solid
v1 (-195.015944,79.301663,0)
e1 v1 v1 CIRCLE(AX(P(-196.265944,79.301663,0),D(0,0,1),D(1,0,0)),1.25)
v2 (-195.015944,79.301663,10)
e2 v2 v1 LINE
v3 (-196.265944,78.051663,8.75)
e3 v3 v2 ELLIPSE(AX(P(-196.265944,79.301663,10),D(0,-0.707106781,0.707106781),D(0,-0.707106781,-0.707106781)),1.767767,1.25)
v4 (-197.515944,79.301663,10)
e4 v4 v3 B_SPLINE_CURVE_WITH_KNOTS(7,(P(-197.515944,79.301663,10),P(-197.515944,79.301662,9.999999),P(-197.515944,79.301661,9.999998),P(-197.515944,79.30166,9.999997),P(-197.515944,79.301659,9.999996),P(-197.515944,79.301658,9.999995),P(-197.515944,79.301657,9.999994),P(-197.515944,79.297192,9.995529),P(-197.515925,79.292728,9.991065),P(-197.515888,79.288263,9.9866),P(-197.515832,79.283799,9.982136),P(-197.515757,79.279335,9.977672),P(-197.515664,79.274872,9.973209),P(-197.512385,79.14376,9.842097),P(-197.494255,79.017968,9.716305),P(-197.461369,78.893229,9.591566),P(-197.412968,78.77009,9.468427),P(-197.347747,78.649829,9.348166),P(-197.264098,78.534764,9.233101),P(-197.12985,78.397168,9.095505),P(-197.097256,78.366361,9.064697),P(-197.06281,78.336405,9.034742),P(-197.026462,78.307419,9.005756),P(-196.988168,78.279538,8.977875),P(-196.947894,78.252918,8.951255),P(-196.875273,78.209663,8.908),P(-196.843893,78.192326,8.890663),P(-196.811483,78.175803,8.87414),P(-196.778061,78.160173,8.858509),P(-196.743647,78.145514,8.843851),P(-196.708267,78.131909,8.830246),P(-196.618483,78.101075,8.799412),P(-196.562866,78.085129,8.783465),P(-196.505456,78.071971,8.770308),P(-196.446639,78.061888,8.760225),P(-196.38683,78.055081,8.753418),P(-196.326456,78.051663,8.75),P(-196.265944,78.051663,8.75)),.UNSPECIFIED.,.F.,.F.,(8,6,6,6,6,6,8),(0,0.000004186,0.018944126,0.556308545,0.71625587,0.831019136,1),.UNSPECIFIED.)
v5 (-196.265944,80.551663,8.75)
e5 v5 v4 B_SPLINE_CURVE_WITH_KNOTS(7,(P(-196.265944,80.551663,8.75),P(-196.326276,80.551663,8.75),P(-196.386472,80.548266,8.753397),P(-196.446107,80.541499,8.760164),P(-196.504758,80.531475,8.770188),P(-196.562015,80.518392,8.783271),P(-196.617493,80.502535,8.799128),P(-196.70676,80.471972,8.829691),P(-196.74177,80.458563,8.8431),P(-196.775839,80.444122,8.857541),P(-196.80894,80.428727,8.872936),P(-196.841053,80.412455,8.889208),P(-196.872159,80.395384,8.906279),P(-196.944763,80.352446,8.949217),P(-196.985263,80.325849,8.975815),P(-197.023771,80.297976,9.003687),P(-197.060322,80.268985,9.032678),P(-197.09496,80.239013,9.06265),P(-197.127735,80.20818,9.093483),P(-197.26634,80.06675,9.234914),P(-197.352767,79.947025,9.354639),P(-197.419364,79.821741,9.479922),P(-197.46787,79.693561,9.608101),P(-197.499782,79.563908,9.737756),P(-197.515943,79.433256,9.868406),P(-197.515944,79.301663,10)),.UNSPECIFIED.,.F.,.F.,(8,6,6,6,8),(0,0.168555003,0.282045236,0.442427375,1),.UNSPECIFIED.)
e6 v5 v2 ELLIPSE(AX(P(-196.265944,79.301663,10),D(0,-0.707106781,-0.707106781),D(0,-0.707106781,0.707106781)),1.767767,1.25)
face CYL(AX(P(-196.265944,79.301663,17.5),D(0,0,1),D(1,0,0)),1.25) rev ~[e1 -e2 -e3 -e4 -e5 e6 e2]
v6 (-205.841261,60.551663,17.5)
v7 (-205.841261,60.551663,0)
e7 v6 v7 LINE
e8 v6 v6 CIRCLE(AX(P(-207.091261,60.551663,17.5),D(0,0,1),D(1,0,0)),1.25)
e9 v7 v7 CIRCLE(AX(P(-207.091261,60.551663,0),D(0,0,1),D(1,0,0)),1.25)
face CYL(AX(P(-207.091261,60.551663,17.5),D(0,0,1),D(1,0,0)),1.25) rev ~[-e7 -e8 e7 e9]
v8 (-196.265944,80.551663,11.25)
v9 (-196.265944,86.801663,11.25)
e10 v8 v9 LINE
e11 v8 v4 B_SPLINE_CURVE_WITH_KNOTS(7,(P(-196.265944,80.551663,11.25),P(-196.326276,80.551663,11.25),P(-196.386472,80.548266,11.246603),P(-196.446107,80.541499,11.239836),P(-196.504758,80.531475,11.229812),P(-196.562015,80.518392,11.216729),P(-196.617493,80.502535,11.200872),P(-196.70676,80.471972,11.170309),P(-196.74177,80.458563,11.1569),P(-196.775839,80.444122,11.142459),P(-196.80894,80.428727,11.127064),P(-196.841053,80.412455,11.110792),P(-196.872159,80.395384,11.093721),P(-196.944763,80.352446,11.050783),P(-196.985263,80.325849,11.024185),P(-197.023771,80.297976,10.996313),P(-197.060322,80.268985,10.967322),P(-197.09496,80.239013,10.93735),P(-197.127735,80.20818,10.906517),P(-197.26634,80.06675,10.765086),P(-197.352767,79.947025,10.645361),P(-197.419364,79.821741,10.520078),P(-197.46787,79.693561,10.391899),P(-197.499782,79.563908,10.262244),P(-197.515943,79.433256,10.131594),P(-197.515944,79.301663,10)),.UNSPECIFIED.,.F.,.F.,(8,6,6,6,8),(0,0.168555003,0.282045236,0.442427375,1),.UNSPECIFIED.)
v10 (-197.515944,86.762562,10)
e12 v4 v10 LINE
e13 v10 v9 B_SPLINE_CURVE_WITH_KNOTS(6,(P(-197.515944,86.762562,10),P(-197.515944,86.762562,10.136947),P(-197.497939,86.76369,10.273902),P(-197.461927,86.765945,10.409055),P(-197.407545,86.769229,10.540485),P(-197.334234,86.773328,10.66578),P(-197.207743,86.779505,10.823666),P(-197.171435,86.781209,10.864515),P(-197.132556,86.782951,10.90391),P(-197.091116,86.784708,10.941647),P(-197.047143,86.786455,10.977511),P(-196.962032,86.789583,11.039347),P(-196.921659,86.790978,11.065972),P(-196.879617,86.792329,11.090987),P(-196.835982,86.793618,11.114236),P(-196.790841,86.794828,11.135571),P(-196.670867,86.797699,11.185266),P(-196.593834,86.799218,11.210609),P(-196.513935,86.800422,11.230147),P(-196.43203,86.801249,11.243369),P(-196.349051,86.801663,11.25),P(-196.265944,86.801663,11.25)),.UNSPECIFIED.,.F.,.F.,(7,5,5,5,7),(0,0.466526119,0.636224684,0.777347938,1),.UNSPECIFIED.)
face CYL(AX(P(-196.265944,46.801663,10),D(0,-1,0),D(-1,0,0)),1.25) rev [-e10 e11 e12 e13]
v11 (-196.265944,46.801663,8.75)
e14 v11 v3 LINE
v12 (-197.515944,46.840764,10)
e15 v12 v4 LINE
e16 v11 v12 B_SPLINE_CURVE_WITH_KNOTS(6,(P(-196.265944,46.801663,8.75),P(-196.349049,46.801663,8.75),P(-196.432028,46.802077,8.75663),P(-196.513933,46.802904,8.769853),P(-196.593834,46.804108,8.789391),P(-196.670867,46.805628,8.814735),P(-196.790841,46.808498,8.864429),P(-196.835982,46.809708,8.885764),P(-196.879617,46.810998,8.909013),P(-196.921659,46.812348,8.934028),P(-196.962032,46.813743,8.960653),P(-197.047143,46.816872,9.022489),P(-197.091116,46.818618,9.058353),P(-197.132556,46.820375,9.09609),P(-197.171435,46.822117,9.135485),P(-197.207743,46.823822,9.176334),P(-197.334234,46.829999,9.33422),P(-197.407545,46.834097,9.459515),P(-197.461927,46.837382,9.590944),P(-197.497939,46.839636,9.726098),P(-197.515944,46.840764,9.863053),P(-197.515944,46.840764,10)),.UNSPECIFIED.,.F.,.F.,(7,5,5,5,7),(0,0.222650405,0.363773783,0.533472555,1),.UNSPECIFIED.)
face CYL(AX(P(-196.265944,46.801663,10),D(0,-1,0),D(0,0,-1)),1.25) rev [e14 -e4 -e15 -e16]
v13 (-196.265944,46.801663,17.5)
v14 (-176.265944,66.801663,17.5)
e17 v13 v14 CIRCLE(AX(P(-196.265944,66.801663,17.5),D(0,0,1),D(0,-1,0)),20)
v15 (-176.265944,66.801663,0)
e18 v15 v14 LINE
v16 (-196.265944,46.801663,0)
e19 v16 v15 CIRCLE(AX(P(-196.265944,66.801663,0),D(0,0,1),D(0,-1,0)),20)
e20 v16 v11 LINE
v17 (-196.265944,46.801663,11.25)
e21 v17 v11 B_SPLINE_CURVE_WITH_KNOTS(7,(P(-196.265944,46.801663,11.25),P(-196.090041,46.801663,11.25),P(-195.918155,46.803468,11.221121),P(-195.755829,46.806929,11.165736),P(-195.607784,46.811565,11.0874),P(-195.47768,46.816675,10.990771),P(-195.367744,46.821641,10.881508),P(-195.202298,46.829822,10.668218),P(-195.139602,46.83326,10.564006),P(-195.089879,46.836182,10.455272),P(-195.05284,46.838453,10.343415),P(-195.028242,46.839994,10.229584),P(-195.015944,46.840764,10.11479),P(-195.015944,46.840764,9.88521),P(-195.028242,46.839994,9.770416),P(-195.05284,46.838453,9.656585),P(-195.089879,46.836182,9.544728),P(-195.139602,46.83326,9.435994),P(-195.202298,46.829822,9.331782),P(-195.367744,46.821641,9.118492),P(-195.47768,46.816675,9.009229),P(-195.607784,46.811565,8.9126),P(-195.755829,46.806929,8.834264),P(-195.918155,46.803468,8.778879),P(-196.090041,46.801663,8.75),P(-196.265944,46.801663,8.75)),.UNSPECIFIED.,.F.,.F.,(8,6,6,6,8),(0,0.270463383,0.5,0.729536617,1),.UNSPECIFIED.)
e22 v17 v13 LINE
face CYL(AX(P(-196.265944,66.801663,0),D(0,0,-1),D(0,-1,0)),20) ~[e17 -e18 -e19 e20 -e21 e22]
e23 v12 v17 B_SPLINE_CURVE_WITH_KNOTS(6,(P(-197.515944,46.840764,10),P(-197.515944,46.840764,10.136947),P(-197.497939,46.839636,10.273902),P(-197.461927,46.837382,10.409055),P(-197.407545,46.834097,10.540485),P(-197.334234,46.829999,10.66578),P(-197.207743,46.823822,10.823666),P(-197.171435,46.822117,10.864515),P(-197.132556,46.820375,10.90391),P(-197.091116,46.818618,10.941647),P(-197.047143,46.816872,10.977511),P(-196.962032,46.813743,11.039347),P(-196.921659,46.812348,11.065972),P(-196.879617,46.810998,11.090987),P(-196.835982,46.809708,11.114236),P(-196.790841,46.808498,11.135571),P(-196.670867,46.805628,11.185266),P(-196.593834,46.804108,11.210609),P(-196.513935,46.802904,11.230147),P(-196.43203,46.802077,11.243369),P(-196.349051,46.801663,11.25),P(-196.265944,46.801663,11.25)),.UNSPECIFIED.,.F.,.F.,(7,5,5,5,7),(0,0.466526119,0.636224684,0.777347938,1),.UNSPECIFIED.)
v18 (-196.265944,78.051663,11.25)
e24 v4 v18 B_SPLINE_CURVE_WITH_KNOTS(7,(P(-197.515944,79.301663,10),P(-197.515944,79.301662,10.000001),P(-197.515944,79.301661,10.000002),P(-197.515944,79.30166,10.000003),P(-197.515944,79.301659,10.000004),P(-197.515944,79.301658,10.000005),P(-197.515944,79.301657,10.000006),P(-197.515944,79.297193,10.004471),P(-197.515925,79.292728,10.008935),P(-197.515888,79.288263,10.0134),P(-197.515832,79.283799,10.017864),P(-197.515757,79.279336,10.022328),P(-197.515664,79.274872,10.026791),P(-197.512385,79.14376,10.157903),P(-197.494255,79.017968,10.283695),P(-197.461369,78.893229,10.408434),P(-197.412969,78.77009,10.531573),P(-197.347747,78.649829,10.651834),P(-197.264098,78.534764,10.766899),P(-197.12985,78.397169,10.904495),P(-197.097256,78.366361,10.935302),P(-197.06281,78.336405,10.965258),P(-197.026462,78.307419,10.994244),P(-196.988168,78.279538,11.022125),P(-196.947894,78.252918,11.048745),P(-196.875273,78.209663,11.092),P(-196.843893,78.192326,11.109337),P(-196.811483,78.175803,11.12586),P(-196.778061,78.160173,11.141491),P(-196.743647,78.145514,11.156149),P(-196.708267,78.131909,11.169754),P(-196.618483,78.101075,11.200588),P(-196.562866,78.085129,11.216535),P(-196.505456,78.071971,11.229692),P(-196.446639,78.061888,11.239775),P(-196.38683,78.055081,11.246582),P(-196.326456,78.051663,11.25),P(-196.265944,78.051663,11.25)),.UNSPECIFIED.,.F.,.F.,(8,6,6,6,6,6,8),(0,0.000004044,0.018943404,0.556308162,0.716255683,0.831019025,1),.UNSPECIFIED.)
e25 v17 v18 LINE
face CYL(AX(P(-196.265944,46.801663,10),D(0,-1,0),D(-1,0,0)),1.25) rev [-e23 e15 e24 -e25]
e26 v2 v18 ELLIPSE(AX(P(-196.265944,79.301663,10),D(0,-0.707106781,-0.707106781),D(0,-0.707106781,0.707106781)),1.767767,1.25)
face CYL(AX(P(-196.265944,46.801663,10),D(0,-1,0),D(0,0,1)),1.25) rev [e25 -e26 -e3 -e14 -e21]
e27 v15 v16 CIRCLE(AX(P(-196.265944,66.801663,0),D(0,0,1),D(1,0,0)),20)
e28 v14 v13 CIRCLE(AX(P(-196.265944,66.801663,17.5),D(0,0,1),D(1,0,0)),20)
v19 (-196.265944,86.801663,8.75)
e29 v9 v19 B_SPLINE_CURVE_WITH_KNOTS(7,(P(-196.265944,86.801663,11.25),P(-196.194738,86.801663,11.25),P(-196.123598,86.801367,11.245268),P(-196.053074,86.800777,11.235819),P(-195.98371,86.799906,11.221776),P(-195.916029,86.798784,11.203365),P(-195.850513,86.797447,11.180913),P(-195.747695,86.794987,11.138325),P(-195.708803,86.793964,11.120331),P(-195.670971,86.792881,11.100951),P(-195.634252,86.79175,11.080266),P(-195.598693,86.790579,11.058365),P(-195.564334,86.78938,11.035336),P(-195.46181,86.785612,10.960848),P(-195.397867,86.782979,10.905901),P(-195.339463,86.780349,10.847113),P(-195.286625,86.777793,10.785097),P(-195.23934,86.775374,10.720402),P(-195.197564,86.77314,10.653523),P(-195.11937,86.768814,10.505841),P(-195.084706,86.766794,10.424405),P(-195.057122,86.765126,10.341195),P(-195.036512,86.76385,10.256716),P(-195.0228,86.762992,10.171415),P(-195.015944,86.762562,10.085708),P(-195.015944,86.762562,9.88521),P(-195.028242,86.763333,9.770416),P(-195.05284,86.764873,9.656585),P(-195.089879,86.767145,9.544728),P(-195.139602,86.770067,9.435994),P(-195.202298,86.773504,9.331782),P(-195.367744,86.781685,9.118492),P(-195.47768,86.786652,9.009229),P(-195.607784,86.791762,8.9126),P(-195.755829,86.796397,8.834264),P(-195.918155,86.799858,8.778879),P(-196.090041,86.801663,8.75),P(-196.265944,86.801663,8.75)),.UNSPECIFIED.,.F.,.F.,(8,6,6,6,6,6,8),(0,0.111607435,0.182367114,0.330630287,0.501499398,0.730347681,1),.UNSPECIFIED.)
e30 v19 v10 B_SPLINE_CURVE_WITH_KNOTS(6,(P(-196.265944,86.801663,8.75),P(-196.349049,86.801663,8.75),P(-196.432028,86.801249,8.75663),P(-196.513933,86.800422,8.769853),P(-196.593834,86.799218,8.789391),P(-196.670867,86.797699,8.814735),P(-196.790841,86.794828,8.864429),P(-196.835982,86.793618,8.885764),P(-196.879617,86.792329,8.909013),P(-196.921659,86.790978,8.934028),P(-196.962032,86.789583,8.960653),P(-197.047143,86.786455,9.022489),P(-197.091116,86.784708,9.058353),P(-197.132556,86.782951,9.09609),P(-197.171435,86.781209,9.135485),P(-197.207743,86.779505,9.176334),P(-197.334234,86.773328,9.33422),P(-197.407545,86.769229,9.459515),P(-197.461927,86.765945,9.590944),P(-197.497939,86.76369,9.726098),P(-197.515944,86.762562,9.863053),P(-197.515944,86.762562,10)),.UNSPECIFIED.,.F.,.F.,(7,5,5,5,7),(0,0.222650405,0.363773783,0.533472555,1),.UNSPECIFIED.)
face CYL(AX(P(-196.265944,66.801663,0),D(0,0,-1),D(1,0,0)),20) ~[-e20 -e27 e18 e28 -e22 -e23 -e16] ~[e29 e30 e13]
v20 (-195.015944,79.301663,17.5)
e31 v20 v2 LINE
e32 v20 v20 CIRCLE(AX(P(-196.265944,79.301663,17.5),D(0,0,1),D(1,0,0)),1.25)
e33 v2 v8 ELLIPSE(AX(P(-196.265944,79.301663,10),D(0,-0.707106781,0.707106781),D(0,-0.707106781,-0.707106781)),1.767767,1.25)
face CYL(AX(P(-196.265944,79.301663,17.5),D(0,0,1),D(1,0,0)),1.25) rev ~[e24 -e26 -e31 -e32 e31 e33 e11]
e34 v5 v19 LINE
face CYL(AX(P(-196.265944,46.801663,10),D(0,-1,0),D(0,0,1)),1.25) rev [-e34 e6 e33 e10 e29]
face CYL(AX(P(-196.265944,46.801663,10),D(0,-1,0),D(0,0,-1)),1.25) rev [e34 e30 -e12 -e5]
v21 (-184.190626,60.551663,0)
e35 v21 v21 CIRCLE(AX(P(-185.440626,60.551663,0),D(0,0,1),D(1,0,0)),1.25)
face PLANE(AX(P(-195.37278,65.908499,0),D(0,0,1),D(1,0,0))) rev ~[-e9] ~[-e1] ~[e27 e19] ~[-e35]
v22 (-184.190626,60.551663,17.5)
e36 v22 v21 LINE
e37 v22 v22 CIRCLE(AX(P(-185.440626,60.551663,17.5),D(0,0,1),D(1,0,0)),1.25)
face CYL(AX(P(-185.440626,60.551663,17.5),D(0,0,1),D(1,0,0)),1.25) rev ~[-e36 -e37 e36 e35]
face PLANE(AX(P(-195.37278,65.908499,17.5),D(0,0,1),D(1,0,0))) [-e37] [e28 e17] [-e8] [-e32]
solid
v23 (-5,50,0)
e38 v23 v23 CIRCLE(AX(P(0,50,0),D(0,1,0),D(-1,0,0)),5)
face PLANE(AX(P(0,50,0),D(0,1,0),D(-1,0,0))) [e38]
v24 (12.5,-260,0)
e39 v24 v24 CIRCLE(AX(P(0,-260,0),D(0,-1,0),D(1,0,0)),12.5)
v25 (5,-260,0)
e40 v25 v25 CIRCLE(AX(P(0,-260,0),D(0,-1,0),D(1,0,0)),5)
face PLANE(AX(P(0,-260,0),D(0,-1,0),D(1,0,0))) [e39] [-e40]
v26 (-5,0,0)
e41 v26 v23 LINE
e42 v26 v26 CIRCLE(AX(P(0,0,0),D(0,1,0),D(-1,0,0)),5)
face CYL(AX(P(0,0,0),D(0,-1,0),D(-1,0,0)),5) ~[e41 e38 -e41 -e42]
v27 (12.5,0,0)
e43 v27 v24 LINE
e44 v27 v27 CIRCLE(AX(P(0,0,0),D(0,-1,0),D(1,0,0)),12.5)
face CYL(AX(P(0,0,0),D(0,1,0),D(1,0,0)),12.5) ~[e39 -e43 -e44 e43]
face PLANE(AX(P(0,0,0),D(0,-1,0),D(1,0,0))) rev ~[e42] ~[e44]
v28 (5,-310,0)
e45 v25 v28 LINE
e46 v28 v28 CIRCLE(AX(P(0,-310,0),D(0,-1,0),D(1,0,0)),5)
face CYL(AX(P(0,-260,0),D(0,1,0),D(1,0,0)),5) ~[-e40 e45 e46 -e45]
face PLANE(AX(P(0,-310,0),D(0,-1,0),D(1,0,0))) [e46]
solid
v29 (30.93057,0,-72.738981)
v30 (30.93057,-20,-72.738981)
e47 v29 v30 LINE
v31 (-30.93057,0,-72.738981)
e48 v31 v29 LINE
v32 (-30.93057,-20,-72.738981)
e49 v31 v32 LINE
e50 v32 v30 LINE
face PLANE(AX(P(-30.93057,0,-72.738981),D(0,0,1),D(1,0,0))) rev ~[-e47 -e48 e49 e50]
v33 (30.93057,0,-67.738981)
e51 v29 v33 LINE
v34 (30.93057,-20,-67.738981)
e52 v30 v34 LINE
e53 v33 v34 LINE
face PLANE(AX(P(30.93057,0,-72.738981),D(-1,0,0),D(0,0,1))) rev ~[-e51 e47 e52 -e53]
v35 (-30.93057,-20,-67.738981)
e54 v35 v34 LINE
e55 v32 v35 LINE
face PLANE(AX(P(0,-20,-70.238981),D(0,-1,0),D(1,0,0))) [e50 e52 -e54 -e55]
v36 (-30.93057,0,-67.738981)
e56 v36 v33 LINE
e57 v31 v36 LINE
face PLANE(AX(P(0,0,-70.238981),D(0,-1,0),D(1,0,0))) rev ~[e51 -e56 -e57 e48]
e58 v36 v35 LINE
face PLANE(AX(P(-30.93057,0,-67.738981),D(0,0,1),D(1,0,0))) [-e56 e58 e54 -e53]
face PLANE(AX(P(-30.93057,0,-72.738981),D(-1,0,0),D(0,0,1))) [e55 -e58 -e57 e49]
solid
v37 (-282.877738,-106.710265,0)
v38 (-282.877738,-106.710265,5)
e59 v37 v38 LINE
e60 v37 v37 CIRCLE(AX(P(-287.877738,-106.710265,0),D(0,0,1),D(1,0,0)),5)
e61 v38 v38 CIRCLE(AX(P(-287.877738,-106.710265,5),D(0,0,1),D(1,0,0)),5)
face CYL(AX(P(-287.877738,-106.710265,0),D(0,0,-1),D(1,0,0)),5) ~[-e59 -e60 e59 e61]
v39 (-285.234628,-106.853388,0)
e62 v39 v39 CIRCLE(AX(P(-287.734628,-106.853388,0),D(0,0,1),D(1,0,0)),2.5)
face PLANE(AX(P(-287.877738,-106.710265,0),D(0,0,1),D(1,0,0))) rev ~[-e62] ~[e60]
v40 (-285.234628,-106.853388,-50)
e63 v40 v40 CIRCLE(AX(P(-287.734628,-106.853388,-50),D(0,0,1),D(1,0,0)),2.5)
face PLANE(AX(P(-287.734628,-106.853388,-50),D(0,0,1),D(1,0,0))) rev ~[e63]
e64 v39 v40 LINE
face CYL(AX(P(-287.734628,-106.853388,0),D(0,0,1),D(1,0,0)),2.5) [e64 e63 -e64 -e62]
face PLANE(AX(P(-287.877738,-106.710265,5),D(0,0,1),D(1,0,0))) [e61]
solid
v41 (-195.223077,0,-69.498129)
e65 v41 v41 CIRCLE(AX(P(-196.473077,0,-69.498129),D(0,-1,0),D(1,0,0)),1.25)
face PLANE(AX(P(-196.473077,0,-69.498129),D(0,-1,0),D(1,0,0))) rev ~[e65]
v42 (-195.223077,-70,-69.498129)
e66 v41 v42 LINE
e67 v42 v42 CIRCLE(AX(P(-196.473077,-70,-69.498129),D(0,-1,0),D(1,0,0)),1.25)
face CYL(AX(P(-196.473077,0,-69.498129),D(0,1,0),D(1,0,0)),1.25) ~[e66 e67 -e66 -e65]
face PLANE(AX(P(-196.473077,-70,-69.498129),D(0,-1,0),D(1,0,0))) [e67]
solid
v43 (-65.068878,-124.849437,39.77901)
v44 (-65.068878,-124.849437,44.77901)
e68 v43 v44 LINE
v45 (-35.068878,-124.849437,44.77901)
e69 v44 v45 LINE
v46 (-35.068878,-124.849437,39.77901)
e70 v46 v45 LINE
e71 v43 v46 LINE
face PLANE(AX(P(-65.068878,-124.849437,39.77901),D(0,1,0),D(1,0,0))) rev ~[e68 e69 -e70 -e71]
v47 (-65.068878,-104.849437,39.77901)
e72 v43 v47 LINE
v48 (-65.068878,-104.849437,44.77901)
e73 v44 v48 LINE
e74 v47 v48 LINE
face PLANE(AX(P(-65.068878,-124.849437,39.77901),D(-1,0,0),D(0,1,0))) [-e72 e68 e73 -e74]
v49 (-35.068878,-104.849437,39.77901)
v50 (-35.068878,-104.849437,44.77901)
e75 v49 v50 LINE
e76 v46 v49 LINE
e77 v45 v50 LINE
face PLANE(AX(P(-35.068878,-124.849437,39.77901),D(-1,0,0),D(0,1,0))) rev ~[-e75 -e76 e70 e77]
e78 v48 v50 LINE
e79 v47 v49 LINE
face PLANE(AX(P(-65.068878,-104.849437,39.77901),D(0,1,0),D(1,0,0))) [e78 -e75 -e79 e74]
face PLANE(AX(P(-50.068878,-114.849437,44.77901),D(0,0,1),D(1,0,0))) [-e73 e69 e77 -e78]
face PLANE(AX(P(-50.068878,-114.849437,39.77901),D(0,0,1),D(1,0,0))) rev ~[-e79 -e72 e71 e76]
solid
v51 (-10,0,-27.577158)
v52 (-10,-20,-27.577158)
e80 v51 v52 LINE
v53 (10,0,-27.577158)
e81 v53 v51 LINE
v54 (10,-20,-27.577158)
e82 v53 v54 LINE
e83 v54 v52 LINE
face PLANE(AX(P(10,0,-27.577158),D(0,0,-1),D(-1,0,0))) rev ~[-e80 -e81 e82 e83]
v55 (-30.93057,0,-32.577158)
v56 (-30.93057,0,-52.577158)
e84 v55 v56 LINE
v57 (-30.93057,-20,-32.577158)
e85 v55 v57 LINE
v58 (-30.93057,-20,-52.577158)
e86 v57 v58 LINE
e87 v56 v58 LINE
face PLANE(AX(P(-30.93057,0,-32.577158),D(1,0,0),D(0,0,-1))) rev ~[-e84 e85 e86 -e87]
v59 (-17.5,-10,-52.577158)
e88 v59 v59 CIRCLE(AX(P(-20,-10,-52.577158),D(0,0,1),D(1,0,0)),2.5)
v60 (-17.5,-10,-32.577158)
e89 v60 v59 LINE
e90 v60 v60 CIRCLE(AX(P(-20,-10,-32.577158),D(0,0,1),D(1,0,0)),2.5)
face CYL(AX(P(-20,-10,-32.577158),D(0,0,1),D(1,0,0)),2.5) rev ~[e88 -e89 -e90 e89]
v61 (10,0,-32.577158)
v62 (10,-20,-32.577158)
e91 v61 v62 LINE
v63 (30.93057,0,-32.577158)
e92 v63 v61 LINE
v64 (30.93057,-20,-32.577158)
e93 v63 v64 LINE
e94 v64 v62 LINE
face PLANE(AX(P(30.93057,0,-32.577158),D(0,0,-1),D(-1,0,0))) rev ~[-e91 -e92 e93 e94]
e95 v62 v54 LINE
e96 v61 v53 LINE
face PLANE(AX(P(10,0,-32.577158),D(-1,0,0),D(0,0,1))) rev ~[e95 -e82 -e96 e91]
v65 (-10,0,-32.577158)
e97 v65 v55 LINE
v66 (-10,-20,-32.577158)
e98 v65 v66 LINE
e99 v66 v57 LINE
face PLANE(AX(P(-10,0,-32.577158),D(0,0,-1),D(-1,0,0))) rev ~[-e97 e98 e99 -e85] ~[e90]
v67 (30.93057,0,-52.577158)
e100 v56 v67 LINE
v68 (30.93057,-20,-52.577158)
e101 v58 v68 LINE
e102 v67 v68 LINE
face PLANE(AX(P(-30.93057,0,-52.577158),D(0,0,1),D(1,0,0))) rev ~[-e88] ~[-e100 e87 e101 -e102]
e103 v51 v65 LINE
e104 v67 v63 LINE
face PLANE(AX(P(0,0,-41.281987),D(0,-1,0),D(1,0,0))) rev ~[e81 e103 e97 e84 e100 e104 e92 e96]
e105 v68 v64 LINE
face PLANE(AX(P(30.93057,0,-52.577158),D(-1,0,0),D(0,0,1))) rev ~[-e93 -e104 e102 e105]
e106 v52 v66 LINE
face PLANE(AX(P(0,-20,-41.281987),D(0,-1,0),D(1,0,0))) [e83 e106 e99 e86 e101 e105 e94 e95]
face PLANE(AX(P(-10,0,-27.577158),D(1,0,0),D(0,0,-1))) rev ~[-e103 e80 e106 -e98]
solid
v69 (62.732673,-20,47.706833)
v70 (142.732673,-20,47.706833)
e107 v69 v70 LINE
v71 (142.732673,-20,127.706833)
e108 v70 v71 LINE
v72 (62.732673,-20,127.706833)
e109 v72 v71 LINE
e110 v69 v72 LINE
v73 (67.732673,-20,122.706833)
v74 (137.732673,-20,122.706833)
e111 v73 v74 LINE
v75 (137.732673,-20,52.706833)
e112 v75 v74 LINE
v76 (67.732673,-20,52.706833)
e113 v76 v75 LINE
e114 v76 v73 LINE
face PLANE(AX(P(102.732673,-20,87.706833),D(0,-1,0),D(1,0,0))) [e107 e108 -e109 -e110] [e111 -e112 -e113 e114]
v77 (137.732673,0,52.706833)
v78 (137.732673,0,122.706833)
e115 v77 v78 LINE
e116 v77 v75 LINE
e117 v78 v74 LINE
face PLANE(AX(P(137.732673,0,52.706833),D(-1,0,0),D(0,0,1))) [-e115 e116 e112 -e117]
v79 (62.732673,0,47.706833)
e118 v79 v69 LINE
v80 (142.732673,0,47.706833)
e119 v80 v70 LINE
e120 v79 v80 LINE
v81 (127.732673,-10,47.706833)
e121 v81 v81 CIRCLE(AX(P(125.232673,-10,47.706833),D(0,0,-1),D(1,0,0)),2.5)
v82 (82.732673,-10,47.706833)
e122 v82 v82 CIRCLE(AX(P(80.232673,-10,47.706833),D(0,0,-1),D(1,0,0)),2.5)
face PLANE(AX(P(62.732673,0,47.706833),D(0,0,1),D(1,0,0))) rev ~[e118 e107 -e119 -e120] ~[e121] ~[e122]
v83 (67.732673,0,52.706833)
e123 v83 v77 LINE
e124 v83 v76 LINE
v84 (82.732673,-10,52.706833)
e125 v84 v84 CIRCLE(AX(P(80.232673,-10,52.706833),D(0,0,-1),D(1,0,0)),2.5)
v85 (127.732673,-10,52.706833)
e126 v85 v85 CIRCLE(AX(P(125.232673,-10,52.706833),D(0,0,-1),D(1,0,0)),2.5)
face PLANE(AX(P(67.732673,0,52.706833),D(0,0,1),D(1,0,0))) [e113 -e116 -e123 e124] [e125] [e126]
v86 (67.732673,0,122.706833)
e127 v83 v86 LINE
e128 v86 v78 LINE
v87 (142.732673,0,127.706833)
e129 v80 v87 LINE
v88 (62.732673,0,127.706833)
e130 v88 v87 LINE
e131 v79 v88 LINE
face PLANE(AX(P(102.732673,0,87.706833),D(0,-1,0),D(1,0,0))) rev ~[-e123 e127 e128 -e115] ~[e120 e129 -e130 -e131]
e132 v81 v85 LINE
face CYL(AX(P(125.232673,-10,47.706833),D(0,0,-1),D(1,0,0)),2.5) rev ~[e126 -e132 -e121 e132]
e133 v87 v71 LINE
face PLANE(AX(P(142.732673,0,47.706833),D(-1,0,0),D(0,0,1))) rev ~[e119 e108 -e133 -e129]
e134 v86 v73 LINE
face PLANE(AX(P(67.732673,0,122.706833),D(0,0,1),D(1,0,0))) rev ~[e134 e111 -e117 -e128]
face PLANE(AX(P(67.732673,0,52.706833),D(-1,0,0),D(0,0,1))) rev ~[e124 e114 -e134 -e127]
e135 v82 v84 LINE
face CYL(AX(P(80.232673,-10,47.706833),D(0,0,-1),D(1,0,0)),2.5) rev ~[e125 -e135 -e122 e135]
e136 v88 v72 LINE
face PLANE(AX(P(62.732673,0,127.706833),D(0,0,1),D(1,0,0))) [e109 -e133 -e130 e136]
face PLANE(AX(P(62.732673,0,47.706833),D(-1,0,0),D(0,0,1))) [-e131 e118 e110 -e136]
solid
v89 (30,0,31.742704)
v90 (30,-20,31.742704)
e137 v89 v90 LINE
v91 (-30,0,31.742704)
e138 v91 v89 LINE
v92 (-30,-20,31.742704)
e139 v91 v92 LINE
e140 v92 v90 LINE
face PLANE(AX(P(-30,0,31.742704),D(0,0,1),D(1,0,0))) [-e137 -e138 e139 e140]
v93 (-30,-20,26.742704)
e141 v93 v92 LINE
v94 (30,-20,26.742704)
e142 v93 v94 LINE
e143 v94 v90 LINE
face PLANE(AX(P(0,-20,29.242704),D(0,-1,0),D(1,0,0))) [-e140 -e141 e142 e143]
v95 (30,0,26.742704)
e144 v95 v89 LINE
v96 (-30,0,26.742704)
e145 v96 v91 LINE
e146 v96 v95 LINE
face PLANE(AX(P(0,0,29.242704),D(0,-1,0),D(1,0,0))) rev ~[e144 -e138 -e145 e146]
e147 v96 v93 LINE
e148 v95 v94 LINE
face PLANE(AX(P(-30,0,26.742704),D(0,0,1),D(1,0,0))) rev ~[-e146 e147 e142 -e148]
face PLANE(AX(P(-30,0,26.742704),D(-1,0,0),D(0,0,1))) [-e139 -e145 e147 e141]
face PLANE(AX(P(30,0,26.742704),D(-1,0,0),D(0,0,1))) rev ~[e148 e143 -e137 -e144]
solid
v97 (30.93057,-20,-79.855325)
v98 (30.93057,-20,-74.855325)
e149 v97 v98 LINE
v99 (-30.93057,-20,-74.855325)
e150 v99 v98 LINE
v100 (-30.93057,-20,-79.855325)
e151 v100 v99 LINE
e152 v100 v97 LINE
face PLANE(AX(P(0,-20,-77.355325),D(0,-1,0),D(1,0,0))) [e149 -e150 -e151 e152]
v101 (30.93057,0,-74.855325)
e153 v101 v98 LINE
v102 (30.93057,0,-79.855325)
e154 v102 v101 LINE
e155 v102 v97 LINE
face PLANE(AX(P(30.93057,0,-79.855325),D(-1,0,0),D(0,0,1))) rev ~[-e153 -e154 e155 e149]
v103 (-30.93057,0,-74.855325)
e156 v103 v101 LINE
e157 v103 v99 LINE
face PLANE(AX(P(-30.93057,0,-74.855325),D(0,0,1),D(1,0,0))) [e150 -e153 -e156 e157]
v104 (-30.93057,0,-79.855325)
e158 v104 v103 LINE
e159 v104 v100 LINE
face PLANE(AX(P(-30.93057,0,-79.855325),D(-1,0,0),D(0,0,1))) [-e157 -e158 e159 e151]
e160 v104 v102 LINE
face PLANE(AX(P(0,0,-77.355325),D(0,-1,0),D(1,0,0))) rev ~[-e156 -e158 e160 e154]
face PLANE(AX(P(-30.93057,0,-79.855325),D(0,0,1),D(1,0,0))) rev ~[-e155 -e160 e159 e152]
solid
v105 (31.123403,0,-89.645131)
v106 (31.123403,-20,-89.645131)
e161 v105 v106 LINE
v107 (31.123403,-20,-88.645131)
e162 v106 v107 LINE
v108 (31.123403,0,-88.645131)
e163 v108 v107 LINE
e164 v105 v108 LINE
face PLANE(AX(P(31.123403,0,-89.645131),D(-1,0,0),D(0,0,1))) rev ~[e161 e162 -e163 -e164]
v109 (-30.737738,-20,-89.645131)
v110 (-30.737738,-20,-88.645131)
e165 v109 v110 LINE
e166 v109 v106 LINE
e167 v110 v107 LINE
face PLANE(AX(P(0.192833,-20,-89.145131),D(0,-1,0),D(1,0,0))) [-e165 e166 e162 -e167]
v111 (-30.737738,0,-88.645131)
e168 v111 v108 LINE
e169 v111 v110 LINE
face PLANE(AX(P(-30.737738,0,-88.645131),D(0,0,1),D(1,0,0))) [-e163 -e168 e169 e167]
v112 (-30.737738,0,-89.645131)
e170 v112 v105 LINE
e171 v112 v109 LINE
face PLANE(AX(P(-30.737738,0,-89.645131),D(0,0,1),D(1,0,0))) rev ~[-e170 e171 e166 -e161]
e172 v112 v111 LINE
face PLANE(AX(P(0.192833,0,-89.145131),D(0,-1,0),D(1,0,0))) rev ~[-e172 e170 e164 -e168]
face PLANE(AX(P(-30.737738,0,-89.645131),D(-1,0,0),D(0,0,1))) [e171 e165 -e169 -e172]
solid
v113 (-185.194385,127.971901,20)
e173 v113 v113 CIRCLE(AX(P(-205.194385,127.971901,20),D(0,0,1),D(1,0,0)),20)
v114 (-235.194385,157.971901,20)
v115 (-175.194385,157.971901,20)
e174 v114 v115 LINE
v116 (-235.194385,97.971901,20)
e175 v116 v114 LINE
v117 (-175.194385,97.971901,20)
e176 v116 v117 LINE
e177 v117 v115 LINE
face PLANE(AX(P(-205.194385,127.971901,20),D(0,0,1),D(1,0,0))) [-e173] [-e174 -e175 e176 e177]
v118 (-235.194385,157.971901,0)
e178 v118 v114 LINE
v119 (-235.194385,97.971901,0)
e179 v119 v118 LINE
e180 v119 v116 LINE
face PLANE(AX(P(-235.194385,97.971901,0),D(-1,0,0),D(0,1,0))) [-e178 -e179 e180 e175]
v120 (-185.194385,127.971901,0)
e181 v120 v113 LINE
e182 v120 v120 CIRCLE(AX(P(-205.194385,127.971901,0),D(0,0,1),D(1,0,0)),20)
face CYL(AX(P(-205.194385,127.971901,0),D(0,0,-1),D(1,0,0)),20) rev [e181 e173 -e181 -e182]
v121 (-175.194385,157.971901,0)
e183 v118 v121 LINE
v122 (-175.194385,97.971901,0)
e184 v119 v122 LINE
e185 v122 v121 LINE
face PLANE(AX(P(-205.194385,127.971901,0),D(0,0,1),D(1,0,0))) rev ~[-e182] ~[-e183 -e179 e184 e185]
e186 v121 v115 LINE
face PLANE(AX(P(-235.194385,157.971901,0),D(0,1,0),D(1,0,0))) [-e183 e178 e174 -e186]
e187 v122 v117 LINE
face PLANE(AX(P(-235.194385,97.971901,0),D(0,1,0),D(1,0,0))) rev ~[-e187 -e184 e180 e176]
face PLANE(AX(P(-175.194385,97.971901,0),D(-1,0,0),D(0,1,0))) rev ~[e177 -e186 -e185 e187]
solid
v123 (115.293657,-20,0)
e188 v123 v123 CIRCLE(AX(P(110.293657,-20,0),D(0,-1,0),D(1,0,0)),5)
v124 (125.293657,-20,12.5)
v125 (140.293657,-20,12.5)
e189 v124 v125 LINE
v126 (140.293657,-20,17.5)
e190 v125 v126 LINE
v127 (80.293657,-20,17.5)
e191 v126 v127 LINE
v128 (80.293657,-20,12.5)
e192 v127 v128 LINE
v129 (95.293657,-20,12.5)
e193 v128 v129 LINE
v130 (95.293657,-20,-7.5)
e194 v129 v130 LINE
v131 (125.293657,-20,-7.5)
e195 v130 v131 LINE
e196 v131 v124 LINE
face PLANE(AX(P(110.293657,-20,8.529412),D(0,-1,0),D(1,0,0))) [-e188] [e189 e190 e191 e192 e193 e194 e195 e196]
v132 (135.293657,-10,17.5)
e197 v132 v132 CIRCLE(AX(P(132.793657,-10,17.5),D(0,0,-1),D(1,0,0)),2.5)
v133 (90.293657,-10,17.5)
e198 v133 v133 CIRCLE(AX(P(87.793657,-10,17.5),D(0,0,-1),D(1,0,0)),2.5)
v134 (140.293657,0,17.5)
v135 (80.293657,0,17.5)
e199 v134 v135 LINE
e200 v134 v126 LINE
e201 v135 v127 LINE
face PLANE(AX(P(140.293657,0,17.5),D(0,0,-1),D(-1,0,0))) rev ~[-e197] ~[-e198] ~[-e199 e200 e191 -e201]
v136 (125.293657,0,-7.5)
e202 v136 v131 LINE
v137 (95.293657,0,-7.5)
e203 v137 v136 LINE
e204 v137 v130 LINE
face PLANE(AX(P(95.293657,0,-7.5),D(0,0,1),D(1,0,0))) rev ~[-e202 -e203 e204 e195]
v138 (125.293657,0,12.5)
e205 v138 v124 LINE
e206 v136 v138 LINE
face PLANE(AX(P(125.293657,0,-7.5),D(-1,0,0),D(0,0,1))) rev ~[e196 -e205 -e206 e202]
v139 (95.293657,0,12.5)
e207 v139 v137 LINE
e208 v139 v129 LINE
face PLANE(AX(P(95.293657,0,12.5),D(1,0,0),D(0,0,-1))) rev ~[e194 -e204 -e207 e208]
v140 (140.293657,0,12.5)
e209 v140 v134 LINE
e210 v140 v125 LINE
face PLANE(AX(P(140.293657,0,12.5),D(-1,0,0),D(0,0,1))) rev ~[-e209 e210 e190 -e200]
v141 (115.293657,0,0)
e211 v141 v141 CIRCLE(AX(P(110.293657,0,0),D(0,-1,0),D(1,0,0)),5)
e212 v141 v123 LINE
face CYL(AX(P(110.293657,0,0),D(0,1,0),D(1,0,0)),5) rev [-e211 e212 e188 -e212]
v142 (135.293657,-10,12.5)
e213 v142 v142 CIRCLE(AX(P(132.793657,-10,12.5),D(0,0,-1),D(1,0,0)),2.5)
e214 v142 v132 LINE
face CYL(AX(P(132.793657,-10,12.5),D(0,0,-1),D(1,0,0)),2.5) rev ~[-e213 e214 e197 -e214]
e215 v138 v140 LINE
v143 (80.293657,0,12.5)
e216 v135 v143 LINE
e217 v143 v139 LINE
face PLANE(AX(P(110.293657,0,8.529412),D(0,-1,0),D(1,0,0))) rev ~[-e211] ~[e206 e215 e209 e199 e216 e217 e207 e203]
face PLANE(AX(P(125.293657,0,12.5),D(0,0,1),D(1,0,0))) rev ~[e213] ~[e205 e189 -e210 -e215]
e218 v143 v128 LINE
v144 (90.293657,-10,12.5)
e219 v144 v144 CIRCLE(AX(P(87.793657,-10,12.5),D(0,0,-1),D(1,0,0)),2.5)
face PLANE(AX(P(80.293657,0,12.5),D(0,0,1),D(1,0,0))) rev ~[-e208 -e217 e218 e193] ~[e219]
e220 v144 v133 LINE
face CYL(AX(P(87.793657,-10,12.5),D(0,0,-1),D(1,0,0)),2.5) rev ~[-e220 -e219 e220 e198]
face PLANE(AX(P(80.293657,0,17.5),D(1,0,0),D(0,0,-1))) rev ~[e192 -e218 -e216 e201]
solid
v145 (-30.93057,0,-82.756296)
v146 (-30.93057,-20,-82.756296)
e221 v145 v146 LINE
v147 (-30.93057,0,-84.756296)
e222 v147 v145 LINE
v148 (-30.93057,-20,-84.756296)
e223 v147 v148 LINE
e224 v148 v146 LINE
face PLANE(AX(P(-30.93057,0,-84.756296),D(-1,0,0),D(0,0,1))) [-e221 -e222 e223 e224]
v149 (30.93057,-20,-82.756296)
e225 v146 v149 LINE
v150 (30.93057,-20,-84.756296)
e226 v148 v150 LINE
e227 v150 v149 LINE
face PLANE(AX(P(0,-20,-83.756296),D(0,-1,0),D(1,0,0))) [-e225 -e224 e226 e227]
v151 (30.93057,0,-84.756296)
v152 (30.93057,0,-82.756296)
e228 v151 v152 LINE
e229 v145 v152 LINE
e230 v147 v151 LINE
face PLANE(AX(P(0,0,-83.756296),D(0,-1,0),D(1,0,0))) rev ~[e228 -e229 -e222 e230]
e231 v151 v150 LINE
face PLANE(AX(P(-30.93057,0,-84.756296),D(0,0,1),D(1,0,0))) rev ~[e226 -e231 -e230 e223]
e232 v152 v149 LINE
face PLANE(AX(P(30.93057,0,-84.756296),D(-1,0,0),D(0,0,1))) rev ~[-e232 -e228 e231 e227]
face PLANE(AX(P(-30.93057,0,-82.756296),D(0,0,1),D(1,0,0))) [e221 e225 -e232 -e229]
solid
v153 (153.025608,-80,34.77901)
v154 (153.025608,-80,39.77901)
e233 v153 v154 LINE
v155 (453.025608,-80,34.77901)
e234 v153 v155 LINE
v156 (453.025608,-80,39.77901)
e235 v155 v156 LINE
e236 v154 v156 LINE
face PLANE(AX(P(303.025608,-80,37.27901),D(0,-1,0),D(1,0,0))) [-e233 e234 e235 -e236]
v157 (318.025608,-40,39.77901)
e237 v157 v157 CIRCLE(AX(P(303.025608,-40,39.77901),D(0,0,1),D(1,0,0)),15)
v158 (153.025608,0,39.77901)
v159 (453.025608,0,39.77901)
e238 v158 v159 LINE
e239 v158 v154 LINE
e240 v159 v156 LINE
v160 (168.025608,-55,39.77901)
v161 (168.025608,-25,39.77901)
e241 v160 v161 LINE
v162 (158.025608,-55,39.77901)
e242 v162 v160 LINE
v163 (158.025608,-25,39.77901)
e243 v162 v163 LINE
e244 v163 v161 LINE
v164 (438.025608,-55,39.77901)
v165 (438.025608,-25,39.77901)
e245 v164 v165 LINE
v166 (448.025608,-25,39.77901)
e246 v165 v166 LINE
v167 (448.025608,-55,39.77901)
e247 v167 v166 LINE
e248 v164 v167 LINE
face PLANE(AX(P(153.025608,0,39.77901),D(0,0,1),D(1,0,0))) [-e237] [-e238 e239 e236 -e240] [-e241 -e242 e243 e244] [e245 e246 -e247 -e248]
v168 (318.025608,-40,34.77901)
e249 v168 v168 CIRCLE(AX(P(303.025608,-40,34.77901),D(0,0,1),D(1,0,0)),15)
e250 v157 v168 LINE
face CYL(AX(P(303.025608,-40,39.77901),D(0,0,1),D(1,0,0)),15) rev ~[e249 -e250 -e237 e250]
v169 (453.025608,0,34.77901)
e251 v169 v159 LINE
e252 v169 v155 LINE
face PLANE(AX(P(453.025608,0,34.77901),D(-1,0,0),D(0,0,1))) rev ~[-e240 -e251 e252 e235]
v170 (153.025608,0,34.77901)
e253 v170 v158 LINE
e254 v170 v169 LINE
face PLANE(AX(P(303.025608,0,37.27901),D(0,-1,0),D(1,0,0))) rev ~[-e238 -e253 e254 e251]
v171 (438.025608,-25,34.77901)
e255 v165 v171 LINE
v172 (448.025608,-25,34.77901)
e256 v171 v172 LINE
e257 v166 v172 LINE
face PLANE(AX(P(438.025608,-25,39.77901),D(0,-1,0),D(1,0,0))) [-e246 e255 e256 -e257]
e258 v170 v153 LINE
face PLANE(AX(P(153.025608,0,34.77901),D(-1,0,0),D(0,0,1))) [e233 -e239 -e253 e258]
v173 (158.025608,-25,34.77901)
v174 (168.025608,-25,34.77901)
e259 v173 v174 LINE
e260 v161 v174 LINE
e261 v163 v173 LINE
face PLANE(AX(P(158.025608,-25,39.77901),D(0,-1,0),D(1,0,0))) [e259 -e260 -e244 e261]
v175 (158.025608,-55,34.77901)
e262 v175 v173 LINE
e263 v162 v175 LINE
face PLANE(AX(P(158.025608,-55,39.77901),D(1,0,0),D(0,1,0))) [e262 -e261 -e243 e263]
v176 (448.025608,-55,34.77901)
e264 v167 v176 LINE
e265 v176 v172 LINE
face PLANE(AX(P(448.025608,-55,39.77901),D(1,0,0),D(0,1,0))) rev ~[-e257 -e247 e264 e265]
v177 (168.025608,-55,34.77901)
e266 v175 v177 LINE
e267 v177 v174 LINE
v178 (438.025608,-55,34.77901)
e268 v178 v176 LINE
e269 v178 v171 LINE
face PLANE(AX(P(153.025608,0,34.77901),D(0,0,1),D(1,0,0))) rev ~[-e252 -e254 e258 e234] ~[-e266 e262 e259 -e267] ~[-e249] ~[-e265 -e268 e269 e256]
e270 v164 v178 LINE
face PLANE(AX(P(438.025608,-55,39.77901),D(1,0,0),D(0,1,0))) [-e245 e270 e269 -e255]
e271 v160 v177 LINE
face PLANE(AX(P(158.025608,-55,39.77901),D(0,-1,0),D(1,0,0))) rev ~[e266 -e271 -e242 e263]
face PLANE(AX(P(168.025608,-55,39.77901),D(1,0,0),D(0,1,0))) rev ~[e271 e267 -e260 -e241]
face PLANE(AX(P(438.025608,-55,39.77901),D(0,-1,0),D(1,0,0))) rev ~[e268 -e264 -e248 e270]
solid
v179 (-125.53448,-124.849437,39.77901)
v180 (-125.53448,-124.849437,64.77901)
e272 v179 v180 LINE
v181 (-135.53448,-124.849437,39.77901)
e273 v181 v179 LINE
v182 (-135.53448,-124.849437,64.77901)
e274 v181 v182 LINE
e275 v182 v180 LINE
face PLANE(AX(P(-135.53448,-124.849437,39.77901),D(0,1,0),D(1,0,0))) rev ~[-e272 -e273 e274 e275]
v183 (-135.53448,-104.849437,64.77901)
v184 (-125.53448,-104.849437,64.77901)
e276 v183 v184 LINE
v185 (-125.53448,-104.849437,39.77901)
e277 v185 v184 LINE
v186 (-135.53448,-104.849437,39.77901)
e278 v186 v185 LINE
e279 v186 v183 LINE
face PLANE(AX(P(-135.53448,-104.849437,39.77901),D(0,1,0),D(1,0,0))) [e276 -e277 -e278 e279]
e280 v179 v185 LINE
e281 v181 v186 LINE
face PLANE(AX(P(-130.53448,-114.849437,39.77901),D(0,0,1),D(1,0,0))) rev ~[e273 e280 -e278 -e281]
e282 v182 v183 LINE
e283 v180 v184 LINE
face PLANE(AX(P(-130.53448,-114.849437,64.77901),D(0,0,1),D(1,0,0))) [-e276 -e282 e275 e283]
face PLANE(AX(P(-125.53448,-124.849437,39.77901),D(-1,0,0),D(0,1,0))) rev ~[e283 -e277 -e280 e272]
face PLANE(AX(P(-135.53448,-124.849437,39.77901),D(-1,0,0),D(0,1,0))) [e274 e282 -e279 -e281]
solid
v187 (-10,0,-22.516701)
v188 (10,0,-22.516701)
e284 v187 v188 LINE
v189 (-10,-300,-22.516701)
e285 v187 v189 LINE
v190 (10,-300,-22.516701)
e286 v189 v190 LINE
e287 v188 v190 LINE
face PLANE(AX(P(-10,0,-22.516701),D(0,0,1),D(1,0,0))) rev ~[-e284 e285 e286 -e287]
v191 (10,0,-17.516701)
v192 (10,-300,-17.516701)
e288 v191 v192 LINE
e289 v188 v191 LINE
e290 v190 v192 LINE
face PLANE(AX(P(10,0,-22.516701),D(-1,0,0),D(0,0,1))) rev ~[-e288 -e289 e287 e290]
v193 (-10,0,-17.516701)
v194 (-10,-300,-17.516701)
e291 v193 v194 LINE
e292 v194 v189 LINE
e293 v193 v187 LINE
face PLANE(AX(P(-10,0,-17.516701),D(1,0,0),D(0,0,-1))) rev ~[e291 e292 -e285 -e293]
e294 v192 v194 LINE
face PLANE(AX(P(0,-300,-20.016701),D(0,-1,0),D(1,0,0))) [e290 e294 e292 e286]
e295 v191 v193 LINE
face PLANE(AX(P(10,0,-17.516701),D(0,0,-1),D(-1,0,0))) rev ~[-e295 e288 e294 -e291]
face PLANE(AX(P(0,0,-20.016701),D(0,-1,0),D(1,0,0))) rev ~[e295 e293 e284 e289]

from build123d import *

# Parameters (mm, degrees)
F0_R      = 5
F1_DEPTH  = 20
F0_W      = 60
F0_H      = 5
F0_W_2    = 80
F0_H_2    = 80
F0_W_3    = 70
F0_H_3    = 70
F0_W_4    = 61.861140081
F0_H_4    = 1
F0_H_5    = 2
F0_R_2    = 12.5
F2_DEPTH  = 260
F3_R      = 5
F4_DEPTH  = 50
F5_DEPTH  = 300
F6_R      = 2.5
F7_DEPTH  = 25
F9_R      = 2.5
F8_R      = 2.5
F10_DEPTH = 25
F14_R     = 5
F15_DEPTH = 50
F16_W     = 300
F16_H     = 5
F17_DEPTH = 80
F20_DEPTH = 17.5
F19_W     = 60
F19_H     = 60
F19_R     = 20
F21_DEPTH = 20
F18_W     = 10
F18_H     = 30
F18_R     = 15
F22_DEPTH = 129.4251411048
F18_H_2   = 20
F23_DEPTH = 25
F18_W_2   = 30
F24_DEPTH = 5
F13_R     = 2.5
F25_DEPTH = 5
F26_R     = 5
F27_DEPTH = 5
F28_R     = 2.5
F29_DEPTH = 50
F32_DEPTH = 111.1712381574
F33_R     = 1.25
F34_DEPTH = 70
F35_R     = 1.25
F36_DEPTH = 107.1461310813


# Not quite as in the source:
# - a feature of the source that left no trace in its solid (it failed there, or was rolled back) is left out
# - a feature names something its author has since deleted; it is built from what else it names


with BuildPart() as f1:
    # F0 (on Front) → F1 (new body)
    with BuildSketch(Plane.XZ):
        Polygon((95.2936565876, -7.5), (110.2936565876, -7.5), (125.2936565876, -7.5), (125.2936565876, 12.5), (140.2936565876, 12.5), (140.2936565876, 17.5), (110.2936565876, 17.5), (80.2936565876, 17.5), (80.2936565876, 12.5), (95.2936565876, 12.5), align=None)
        with Locations((110.2936565876, 0)):
            Circle(F0_R, mode=Mode.SUBTRACT)
    extrude(amount=F1_DEPTH)

    # F9 (on face) + F8 (on face) → F10 (cut)
    with BuildSketch(Plane(origin=(0, 0, 12.5), x_dir=(1, 0, 0), z_dir=(0, 0, -1))):
        with Locations((87.7936565876, 10)):
            Circle(F9_R)
    with BuildSketch(Plane(origin=(0, 0, 12.5), x_dir=(1, 0, 0), z_dir=(0, 0, -1))):
        with Locations((132.7936565876, 10)):
            Circle(F8_R)
    extrude(amount=-F10_DEPTH, mode=Mode.SUBTRACT)


with BuildPart() as f1b:
    # F0 (on Front) → F1, piece 2 (new body)
    with BuildSketch(Plane.XZ):
        with Locations((0, 29.2427036911)):
            Rectangle(F0_W, F0_H)
    extrude(amount=F1_DEPTH)


with BuildPart() as f1c:
    # F0 (on Front) → F1, piece 3 (new body)
    with BuildSketch(Plane.XZ):
        Polygon((10, -27.5771580637), (0, -27.5771580637), (-10, -27.5771580637), (-10, -32.5771580637), (-10.9305700405, -32.5771580637), (-30.9305700405, -32.5771580637), (-30.9305700405, -52.5771580637), (0, -52.5771580637), (30.9305700405, -52.5771580637), (30.9305700405, -32.5771580637), (10.9305700405, -32.5771580637), (10, -32.5771580637), align=None)
    extrude(amount=F1_DEPTH)

    # F6 (on face) → F7 (cut)
    with BuildSketch(Plane.XY.offset(-32.5771580637)):
        with Locations((-20, -10)):
            Circle(F6_R)
    extrude(amount=-F7_DEPTH, mode=Mode.SUBTRACT)


with BuildPart() as f1d:
    # F0 (on Front) → F1, piece 4 (new body)
    with BuildSketch(Plane.XZ):
        with Locations((102.7326732874, 87.7068325877)):
            Rectangle(F0_W_2, F0_H_2)
        with Locations((102.7326732874, 87.7068325877)):
            Rectangle(F0_W_3, F0_H_3, mode=Mode.SUBTRACT)
    extrude(amount=F1_DEPTH)

    # F13 (on face) → F25 (cut, through all)
    with BuildSketch(Plane(origin=(0, 0, 47.7068325877), x_dir=(1, 0, 0), z_dir=(0, 0, -1))):
        with Locations((125.2326732874, 10)):
            Circle(F13_R)
        with Locations((80.2326732874, 10)):
            Circle(F13_R)
    extrude(amount=-F25_DEPTH, mode=Mode.SUBTRACT)


with BuildPart() as f1e:
    # F0 (on Front) → F1, piece 5 (new body)
    with BuildSketch(Plane.XZ):
        with Locations((0, -77.355325222)):
            Rectangle(F0_W_4, F0_H)
    extrude(amount=F1_DEPTH)


with BuildPart() as f1f:
    # F0 (on Front) → F1, piece 6 (new body)
    with BuildSketch(Plane.XZ):
        with Locations((0.1928325291, -89.1451310813)):
            Rectangle(F0_W_4, F0_H_4)
    extrude(amount=F1_DEPTH)


with BuildPart() as f1g:
    # F0 (on Front) → F1, piece 7 (new body)
    with BuildSketch(Plane.XZ):
        with Locations((0, -83.756296128)):
            Rectangle(F0_W_4, F0_H_5)
    extrude(amount=F1_DEPTH)


with BuildPart() as f1h:
    # F0 (on Front) → F1, piece 8 (new body)
    with BuildSketch(Plane.XZ):
        with Locations((0, -70.2389810979)):
            Rectangle(F0_W_4, F0_H)
    extrude(amount=F1_DEPTH)


with BuildPart() as f2:
    # F0 (on Front) → F2 (new body)
    with BuildSketch(Plane.XZ):
        Circle(F0_R_2)
    extrude(amount=F2_DEPTH)

    # F3 (on face) → F4 (join)
    with BuildSketch(Plane.XZ.offset(260)):
        Circle(F3_R)
    extrude(amount=F4_DEPTH)

    # F14 (on face) → F15 (join)
    with BuildSketch(Plane(origin=(0, 0, 0), x_dir=(-1, 0, 0), z_dir=(0, 1, 0))):
        Circle(F14_R)
    extrude(amount=F15_DEPTH)


with BuildPart() as f5:
    # F0 (on Front) → F5 (new body)
    with BuildSketch(Plane.XZ):
        Polygon((-10, -22.5167013705), (0, -22.5167013705), (10, -22.5167013705), (10, -17.5167013705), (0, -17.5167013705), (-10, -17.5167013705), align=None)
    extrude(amount=F5_DEPTH)


with BuildPart() as f17:
    # F16 (on Front) → F17 (new body)
    with BuildSketch(Plane.XZ):
        with Locations((303.0256081372, 37.2790100235)):
            Rectangle(F16_W, F16_H)
    extrude(amount=F17_DEPTH)

    # F18 (on face) → F22 (cut, through all)
    with BuildSketch(Plane.XY.offset(39.7790100235)):
        with Locations((163.0256081372, -40)):
            Rectangle(F18_W, F18_H)
        with Locations((443.0256081372, -40)):
            Rectangle(F18_W, F18_H)
        with Locations((303.0256081372, -40)):
            Circle(F18_R)
    extrude(amount=-F22_DEPTH, mode=Mode.SUBTRACT)


with BuildPart() as f20:
    # F19 (on Top) → F20 (new body)
    with BuildSketch(Plane.XY):
        with BuildLine():
            ThreePointArc((-196.265943614, 46.8016631402), (-182.1238079903, 52.6595275165), (-176.265943614, 66.8016631402))
            ThreePointArc((-176.265943614, 66.8016631402), (-210.4080792377, 80.9437987639), (-196.265943614, 46.8016631402))
        make_face()
    extrude(amount=F20_DEPTH)

    # F31 (on face) → F32 (cut, through all)
    with BuildSketch(Plane(origin=(0, 46.8016631402, 0), x_dir=(-1, 0, 0), z_dir=(0, 1, 0))):
        with BuildLine():
            Line((196.265943614, 8.75), (196.265943614, 11.25))
            ThreePointArc((196.265943614, 11.25), (195.015943614, 10), (196.265943614, 8.75))
        make_face()
        with BuildLine():
            ThreePointArc((196.265943614, 8.75), (197.1498270905, 9.1161165235), (197.515943614, 10))
            ThreePointArc((197.515943614, 10), (197.1498270905, 10.8838834765), (196.265943614, 11.25))
            Line((196.265943614, 11.25), (196.265943614, 8.75))
        make_face()
    extrude(amount=F32_DEPTH, mode=Mode.SUBTRACT)

    # F35 (on face) → F36 (cut, through all)
    with BuildSketch(Plane.XY.offset(17.5)):
        with Locations((-196.265943614, 79.3016631402)):
            Circle(F35_R)
        with Locations((-185.4406260667, 60.5516631402)):
            Circle(F35_R)
        with Locations((-207.0912611613, 60.5516631402)):
            Circle(F35_R)
    extrude(amount=-F36_DEPTH, mode=Mode.SUBTRACT)


with BuildPart() as f21:
    # F19 (on Top) → F21 (new body)
    with BuildSketch(Plane.XY):
        with Locations((-205.1943850517, 127.9719012976)):
            Rectangle(F19_W, F19_H)
        with Locations((-205.1943850517, 127.9719012976)):
            Circle(F19_R, mode=Mode.SUBTRACT)
    extrude(amount=F21_DEPTH)


with BuildPart() as f23:
    # F18 (on face) → F23 (new body)
    with BuildSketch(Plane.XY.offset(39.7790100235)):
        with Locations((-130.5344802141, -114.8494374752)):
            Rectangle(F18_W, F18_H_2)
    extrude(amount=F23_DEPTH)


with BuildPart() as f24:
    # F18 (on face) → F24 (new body)
    with BuildSketch(Plane.XY.offset(39.7790100235)):
        with Locations((-50.0688782334, -114.8494374752)):
            Rectangle(F18_W_2, F18_H_2)
    extrude(amount=F24_DEPTH)


with BuildPart() as f27:
    # F26 (on Top) → F27 (new body)
    with BuildSketch(Plane.XY):
        with Locations((-287.8777384163, -106.7102653366)):
            Circle(F26_R)
    extrude(amount=F27_DEPTH)

    # F28 (on face) → F29 (join)
    with BuildSketch(Plane.XY):
        with Locations((-287.7346277237, -106.8533882499)):
            Circle(F28_R)
    extrude(amount=-F29_DEPTH)


with BuildPart() as f34:
    # F33 (on Front) → F34 (new body)
    with BuildSketch(Plane.XZ):
        with Locations((-196.4730769396, -69.498129189)):
            Circle(F33_R)
    extrude(amount=F34_DEPTH)


solid = Compound([f1.part, f1b.part, f1c.part, f1d.part, f1e.part, f1f.part, f1g.part, f1h.part, f2.part, f5.part, f17.part, f20.part, f21.part, f23.part, f24.part, f27.part, f34.part])
